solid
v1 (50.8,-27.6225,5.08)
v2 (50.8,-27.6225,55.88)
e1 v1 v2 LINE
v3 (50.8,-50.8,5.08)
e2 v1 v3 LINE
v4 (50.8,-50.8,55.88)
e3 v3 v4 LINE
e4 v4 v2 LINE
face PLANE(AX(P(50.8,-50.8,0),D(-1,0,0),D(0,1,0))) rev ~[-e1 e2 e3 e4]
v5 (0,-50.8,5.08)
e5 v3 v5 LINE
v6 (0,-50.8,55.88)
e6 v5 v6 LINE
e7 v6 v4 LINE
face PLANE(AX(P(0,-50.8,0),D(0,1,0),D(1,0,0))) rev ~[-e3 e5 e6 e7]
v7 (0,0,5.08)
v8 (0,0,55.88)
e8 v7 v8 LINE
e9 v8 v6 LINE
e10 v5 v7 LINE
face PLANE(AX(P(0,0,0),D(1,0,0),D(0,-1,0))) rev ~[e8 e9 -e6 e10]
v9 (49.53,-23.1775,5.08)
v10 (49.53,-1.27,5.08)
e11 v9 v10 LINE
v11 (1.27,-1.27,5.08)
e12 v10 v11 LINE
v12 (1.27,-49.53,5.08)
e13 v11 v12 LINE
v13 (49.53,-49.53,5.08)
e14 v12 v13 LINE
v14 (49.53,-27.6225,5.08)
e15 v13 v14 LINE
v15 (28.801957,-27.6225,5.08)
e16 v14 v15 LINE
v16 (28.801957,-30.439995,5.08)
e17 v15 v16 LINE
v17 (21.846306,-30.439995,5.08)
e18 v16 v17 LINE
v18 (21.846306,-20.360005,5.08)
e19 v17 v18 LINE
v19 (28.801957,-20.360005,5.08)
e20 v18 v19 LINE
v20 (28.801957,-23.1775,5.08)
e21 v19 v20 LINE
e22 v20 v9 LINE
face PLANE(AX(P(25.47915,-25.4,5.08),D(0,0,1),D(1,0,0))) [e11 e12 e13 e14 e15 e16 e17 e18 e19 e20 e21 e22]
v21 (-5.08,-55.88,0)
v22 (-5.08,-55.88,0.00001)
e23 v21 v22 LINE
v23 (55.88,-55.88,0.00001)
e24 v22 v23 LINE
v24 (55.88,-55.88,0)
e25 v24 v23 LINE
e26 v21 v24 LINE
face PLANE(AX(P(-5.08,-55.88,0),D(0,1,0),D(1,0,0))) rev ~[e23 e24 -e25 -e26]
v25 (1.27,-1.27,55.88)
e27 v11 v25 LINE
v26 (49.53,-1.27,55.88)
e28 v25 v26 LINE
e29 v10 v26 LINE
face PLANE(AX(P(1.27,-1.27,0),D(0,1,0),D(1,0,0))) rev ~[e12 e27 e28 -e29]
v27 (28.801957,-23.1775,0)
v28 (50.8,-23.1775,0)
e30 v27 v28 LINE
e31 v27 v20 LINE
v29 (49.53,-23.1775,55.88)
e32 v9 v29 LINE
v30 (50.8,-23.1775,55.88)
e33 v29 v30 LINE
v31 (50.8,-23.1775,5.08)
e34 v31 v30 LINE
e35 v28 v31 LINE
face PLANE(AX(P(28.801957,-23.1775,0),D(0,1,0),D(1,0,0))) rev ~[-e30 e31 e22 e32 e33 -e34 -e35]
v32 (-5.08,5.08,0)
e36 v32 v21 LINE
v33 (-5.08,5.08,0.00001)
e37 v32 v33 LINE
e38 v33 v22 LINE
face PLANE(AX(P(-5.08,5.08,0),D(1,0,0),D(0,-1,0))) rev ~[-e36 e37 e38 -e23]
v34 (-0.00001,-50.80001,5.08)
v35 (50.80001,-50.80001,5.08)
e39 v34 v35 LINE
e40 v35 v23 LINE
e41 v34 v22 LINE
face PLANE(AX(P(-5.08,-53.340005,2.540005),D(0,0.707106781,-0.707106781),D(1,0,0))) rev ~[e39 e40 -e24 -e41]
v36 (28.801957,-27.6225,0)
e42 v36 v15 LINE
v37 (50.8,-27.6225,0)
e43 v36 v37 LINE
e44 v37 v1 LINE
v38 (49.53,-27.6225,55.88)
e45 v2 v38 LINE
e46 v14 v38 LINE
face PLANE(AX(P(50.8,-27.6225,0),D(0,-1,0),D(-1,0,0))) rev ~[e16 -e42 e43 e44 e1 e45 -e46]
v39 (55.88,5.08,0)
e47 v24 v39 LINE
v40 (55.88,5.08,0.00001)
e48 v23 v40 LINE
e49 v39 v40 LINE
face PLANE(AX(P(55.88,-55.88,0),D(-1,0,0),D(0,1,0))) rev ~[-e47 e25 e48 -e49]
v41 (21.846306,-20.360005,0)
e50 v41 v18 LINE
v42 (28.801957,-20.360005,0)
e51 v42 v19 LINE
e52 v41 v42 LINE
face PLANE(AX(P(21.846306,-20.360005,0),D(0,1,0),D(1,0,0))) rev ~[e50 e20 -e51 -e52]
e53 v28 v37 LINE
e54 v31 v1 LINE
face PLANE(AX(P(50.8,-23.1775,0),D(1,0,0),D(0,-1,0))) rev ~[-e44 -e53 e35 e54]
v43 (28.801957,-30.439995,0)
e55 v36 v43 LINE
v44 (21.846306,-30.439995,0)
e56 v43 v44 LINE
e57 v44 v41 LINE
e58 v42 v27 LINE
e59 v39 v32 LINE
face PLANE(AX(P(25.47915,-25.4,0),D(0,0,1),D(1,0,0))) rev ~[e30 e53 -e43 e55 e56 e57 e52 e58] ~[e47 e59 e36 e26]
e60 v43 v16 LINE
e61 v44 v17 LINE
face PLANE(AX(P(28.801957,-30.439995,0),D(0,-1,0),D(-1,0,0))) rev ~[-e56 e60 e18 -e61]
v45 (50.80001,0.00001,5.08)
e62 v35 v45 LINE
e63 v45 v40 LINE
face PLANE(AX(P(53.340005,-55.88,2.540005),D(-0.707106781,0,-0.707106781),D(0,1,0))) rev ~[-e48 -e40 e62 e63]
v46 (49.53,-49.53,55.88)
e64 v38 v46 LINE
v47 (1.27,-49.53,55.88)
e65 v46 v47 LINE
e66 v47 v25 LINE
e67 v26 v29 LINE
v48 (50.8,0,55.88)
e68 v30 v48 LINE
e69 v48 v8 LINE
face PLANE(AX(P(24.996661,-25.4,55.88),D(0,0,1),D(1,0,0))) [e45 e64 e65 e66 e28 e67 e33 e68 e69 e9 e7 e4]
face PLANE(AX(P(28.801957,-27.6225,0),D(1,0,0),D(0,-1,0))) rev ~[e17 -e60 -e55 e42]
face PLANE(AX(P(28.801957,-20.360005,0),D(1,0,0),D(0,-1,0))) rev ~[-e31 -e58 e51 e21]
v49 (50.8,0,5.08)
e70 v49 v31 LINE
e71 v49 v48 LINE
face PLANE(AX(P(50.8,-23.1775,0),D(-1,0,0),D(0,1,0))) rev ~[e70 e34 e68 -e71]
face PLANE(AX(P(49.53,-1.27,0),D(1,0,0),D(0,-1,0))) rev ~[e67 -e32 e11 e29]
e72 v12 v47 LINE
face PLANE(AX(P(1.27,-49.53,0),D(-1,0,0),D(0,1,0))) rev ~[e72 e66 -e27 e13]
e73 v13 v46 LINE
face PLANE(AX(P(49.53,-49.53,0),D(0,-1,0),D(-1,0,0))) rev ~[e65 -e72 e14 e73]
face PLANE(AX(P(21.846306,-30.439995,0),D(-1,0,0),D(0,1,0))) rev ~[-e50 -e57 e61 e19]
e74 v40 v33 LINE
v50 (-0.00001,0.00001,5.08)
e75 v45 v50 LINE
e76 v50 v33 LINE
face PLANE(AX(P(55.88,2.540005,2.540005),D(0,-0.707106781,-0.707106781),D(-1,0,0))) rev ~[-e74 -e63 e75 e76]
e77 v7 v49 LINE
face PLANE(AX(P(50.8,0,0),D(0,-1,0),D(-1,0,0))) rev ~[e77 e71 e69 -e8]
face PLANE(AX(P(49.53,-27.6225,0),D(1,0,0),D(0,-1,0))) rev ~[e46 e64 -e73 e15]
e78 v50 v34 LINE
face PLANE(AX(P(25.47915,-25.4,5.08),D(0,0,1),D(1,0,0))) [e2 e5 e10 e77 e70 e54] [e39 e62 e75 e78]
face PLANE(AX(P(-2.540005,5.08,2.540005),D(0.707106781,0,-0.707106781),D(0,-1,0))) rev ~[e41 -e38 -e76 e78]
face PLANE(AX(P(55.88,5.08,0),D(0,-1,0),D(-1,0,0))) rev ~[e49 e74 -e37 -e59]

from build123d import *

# Parameters (mm, degrees)
F0_W     = 5.08
F0_H     = 4.445
F1_DEPTH = 5.08
F2_DEPTH = 55.88
F4_SIZE  = 5.07999


# Not quite as in the source:
# - a fillet or chamfer is up to 0.001 mm smaller than in the source, because OpenCascade refuses the exact size


with BuildPart() as f1:
    # F0 (on Top) → F1 (new body)
    with BuildSketch(Plane.XY):
        Polygon((0, -50.8), (0, 0), (50.8, 0), (50.8, -23.1775), (55.88, -23.1775), (55.88, 5.08), (-5.08, 5.08), (-5.08, -55.88), (55.88, -55.88), (55.88, -27.6225), (50.8, -27.6225), (50.8, -50.8), align=None)
        with Locations((53.34, -25.4)):
            Rectangle(F0_W, F0_H)
        Polygon((28.8019571453, -23.1775), (49.53, -23.1775), (49.53, -1.27), (1.27, -1.27), (1.27, -49.53), (49.53, -49.53), (49.53, -27.6225), (28.8019571453, -27.6225), (28.8019571453, -30.439995), (21.8463055789, -30.439995), (21.8463055789, -20.360005), (28.8019571453, -20.360005), align=None)
        Polygon((50.8, 0), (0, 0), (0, -50.8), (50.8, -50.8), (50.8, -27.6225), (49.53, -27.6225), (49.53, -49.53), (1.27, -49.53), (1.27, -1.27), (49.53, -1.27), (49.53, -23.1775), (50.8, -23.1775), align=None)
    extrude(amount=F1_DEPTH)

    # F0 (on Top) → F2 (join)
    with BuildSketch(Plane.XY):
        Polygon((50.8, 0), (0, 0), (0, -50.8), (50.8, -50.8), (50.8, -27.6225), (49.53, -27.6225), (49.53, -49.53), (1.27, -49.53), (1.27, -1.27), (49.53, -1.27), (49.53, -23.1775), (50.8, -23.1775), align=None)
    extrude(amount=F2_DEPTH)

    # F4 (size 5.08 in the source; OpenCascade refuses exactly that, so slightly less here)
    f4_edges = [f1.edges().sort_by_distance(p)[0] for p in [
        (-5.08, -25.4, 5.08),
        (25.4, -55.88, 5.08),
        (55.88, -25.4, 5.08),
        (25.4, 5.08, 5.08),
    ]]
    chamfer(f4_edges, length=F4_SIZE)


solid = f1.part
